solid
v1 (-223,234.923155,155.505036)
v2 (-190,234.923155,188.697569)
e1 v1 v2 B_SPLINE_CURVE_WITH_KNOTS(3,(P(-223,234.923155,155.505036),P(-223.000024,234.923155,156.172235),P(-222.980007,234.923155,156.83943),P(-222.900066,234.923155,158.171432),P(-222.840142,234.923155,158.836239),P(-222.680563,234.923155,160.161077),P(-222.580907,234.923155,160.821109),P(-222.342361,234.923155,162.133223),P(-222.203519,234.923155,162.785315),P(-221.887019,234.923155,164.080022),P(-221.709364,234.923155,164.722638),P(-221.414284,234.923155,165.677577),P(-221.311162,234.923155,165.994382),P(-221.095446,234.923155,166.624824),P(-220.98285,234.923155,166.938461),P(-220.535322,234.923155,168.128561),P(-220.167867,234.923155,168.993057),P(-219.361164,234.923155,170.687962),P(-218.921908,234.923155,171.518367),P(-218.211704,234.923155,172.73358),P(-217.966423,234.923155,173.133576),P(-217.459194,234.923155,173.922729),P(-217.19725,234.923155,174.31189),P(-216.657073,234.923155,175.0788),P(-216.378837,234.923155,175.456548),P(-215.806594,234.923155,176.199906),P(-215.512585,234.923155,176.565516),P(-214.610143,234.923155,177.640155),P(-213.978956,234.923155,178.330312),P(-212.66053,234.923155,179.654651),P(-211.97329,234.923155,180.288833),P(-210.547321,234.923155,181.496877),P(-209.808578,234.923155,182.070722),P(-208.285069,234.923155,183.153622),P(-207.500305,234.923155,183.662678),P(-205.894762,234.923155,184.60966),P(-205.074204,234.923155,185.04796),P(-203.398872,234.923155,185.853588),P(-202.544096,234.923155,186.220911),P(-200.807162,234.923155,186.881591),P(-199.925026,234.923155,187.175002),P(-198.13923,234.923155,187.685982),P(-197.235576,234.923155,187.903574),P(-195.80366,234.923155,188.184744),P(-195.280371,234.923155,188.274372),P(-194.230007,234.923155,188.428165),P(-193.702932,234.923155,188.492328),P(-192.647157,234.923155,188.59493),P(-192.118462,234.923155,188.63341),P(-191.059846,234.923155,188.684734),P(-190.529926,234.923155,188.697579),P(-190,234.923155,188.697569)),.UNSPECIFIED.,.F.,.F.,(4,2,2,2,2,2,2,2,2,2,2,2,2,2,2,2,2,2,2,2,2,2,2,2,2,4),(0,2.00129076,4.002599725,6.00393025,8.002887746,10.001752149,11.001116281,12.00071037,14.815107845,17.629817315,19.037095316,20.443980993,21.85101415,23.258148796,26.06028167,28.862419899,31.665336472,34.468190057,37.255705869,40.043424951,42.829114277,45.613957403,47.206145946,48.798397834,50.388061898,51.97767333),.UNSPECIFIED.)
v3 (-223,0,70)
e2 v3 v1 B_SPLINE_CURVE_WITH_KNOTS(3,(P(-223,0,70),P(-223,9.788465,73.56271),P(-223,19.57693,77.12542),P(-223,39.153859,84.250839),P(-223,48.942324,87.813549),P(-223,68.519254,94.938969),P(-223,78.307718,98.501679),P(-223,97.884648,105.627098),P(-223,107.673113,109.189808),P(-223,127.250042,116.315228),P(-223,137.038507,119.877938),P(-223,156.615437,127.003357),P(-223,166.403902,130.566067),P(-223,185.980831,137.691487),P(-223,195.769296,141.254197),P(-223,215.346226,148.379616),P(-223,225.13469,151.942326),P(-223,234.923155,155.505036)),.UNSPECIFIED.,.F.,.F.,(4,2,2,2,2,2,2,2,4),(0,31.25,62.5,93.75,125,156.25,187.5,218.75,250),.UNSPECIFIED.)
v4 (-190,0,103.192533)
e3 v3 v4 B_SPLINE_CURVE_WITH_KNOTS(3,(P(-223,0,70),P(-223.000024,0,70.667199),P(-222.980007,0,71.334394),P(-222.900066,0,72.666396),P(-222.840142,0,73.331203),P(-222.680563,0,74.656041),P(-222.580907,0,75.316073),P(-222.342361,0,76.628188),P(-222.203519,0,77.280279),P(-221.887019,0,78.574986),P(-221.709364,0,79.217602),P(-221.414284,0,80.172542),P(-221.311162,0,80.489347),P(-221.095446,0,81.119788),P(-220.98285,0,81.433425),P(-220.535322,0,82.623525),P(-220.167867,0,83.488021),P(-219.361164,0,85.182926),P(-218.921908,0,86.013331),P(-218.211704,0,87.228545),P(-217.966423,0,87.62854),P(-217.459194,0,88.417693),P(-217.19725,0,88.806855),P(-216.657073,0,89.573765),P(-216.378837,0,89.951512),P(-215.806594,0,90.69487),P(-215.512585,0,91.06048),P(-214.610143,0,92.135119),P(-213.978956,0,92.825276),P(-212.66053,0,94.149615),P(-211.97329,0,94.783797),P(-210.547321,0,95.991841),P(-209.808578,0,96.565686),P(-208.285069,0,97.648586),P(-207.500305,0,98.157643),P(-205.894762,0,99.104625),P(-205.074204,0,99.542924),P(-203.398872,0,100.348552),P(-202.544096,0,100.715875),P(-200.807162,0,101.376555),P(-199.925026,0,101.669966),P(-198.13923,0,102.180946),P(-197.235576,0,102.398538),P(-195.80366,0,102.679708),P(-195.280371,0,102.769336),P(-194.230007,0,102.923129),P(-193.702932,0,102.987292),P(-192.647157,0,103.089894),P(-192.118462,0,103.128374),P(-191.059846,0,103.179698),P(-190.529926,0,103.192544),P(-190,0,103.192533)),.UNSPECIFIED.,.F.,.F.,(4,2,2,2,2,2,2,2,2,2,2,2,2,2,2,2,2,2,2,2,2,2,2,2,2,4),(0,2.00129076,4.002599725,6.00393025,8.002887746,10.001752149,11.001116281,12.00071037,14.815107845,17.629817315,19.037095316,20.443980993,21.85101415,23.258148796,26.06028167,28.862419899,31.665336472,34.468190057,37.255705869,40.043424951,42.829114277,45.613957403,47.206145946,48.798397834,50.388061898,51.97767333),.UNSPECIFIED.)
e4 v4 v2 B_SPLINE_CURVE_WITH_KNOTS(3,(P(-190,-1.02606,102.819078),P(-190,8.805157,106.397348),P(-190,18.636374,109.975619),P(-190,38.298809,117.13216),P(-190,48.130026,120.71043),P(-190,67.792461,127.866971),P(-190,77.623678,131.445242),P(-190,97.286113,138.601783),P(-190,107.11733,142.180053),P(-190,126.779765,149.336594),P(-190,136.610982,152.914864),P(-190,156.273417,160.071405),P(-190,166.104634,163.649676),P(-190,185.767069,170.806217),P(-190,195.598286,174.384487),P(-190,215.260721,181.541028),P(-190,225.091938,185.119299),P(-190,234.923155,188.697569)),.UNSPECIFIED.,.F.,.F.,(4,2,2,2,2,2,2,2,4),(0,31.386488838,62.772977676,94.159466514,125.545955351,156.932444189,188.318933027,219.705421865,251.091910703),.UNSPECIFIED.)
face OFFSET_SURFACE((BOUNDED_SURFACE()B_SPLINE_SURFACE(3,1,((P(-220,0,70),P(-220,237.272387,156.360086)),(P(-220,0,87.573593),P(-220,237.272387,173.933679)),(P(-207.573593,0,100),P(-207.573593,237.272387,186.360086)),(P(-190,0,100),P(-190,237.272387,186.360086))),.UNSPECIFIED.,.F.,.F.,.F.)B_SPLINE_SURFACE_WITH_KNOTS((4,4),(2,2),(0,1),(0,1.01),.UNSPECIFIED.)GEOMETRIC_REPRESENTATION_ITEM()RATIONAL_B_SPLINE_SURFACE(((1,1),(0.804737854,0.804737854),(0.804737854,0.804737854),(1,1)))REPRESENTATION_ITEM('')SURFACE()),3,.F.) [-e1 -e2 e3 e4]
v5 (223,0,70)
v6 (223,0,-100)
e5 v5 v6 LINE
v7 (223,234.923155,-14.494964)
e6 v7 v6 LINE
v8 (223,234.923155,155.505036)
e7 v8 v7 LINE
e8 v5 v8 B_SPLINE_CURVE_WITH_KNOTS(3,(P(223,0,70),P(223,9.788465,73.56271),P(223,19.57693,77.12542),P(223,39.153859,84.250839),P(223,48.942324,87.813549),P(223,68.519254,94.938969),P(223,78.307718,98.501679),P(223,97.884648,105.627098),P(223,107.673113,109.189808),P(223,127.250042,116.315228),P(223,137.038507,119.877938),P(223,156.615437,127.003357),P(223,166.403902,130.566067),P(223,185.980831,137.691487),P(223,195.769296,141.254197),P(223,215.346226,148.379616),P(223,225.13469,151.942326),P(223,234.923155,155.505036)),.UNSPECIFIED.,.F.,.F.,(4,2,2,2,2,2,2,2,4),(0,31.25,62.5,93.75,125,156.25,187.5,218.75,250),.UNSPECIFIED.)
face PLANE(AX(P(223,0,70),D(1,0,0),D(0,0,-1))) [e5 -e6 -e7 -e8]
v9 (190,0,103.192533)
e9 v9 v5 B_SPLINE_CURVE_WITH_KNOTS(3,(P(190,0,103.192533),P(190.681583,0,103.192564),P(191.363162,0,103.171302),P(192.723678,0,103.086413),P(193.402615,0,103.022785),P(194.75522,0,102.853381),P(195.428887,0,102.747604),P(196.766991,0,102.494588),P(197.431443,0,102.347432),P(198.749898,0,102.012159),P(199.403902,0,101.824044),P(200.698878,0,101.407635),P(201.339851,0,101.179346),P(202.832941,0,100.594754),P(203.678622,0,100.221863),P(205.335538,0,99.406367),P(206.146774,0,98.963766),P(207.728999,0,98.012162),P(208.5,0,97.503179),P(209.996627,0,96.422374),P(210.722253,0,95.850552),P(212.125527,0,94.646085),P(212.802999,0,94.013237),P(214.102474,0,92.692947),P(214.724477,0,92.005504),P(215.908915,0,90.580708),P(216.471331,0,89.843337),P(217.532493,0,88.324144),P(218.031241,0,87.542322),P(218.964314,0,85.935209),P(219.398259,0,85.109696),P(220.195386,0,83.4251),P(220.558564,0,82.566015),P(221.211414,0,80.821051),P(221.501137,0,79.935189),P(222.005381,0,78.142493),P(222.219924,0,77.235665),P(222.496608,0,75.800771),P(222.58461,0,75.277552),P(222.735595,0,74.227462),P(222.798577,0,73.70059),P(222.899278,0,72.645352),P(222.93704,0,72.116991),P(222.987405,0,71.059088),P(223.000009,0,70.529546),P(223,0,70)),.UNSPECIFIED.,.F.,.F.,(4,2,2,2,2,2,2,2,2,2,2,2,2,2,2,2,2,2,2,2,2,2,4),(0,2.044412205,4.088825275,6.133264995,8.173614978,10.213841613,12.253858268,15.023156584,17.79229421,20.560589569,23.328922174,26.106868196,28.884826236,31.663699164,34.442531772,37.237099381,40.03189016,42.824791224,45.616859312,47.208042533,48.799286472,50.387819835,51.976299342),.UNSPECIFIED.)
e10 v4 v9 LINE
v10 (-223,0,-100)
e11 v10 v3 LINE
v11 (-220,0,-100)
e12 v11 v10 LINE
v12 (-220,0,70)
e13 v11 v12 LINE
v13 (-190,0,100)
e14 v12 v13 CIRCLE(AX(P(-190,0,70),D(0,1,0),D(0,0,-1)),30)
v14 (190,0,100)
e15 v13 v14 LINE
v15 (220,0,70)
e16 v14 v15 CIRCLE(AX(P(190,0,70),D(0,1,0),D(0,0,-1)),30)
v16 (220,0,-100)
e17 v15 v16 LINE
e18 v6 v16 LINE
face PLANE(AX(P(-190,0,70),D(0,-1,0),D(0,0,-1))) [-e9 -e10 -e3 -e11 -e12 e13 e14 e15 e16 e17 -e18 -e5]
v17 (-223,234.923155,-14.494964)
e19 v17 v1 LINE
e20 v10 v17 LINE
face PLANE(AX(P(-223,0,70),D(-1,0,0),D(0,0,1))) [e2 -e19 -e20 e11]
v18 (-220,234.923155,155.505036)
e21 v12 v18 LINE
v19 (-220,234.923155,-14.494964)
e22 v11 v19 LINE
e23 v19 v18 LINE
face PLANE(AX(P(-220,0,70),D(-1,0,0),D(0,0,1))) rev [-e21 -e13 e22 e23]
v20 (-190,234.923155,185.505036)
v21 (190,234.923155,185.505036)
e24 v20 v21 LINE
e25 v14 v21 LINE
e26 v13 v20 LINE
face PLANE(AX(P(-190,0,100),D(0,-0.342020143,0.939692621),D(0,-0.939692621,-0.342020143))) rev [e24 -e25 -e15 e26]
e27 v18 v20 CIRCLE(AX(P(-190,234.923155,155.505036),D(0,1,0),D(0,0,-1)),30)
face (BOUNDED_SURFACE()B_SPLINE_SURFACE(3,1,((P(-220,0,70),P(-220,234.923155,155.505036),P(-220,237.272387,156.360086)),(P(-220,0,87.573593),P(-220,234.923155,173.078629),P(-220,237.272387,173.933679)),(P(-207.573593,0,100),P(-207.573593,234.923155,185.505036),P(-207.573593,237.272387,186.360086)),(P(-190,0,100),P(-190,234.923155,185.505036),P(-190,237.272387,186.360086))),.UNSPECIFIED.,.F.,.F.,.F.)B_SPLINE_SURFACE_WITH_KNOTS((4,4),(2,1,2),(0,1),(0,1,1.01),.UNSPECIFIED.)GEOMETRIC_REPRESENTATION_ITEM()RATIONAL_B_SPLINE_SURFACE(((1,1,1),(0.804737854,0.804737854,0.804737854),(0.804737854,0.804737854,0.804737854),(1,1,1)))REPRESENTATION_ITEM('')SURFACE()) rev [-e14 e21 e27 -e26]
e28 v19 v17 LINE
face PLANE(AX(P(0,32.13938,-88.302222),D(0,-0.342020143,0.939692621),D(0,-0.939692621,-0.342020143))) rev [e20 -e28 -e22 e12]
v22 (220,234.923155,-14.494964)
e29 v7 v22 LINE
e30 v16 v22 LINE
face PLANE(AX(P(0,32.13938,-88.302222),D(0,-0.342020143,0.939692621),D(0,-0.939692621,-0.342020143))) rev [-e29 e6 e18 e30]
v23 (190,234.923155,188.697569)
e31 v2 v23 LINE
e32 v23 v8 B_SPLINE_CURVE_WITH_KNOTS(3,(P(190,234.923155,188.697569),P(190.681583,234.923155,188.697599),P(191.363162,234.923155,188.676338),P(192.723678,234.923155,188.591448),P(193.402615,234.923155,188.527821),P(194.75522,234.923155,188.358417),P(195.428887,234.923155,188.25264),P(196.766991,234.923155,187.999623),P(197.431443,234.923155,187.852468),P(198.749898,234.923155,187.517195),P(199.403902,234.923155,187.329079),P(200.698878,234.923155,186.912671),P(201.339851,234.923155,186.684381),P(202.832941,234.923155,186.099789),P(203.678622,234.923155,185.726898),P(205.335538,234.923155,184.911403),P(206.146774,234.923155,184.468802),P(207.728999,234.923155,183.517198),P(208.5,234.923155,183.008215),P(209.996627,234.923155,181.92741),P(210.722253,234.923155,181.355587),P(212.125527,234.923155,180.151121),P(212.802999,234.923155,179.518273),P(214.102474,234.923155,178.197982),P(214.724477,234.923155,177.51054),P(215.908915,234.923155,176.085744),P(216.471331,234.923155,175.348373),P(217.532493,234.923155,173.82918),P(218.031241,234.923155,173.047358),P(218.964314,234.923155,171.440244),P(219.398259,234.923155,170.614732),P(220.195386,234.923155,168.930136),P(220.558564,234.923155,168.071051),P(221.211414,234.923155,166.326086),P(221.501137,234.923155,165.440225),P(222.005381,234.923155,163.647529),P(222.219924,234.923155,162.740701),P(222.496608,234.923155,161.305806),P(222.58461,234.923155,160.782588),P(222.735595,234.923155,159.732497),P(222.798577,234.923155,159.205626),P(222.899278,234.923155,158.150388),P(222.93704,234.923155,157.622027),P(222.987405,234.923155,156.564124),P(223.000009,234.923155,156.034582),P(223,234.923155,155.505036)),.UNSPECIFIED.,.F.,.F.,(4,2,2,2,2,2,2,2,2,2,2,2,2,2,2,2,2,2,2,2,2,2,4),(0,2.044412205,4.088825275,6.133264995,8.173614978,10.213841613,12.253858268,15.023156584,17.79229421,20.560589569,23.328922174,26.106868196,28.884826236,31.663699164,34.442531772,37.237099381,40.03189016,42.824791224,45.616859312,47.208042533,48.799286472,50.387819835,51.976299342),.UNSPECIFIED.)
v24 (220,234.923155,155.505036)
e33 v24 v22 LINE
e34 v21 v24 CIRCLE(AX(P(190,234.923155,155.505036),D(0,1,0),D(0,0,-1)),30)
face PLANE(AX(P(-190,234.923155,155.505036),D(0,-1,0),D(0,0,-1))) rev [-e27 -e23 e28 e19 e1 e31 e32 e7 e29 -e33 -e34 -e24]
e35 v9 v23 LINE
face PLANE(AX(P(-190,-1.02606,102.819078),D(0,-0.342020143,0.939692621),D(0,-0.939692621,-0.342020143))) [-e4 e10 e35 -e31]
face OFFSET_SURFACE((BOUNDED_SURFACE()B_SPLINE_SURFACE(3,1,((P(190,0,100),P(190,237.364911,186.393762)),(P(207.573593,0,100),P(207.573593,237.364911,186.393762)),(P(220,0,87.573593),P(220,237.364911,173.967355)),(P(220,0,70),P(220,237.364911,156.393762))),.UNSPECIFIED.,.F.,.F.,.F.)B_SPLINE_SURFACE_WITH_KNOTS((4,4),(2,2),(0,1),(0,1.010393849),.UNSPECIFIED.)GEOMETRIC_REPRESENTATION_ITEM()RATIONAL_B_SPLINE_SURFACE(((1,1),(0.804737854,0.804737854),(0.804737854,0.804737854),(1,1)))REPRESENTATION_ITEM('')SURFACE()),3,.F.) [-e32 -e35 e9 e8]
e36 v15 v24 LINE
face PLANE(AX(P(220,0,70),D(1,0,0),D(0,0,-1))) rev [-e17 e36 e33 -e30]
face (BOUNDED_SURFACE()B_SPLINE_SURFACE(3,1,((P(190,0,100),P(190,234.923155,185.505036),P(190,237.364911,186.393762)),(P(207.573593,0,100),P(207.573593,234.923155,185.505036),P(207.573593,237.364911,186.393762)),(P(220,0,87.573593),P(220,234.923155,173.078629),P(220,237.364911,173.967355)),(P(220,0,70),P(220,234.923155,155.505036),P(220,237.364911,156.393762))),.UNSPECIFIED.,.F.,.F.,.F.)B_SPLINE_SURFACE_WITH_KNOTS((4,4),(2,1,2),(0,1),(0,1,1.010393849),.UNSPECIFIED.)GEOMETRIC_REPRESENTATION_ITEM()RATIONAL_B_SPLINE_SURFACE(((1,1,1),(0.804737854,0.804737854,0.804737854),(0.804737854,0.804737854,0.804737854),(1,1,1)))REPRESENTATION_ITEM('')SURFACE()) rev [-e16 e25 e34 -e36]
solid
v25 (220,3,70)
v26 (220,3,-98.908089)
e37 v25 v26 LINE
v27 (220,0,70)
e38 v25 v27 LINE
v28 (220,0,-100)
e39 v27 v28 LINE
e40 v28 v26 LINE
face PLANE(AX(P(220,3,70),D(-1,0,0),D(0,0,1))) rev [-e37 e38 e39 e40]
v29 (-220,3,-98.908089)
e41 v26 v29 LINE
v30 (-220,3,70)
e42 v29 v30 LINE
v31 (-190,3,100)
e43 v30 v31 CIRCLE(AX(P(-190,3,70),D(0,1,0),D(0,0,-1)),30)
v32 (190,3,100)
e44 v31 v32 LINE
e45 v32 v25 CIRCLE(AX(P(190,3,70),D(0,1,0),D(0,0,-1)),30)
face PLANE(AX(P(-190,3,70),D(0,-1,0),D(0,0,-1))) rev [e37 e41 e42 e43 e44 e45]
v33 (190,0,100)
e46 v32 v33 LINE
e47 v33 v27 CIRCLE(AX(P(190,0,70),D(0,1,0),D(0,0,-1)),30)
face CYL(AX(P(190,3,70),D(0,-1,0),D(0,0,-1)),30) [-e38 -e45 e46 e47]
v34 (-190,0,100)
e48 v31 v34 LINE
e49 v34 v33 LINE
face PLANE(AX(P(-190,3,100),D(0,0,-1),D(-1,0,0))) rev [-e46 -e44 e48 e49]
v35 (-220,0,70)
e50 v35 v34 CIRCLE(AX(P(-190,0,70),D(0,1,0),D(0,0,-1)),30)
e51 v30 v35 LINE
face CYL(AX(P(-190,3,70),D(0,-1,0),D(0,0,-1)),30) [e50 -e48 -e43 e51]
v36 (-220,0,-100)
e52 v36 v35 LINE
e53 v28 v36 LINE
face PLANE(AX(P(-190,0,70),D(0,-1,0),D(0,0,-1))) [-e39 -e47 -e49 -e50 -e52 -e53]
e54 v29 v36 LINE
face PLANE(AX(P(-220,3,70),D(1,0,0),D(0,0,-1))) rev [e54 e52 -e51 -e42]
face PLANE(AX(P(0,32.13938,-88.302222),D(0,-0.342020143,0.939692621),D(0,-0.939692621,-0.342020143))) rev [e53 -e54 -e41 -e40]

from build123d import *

# Parameters (mm, degrees)
SWEEP_THIN1_START       = 35.293924935
SWEEP_THIN1_DEPTH       = 179.41214993
SWEEP_THIN1_START_2     = -35.293925135
SWEEP_THIN1_2_DEPTH     = 320.587850271
SWEEP_THIN1_START_3     = -67
SWEEP_THIN1_3_OUTLINE_W = 446
SWEEP_THIN1_3_OUTLINE_H = 295
SWEEP_THIN1_3_DEPTH     = 67
SWEEP_THIN1_START_4     = 234.923155196
SWEEP_THIN1_4_OUTLINE_W = 446
SWEEP_THIN1_4_OUTLINE_H = 295
SWEEP_THIN1_4_DEPTH     = 66.330881924
BOSS_EXTRUDE2_DEPTH     = 3
SKETCH6_W               = 723.00386444
SKETCH6_H               = 605.053805232
CUT_EXTRUDE1_DEPTH      = 3


with BuildPart() as part:
    # Sweep-Thin1: read off the stored shape, not the designer's step
    # Sweep-Thin1 outline → Sweep-Thin1 (new body)
    with BuildSketch(Plane(origin=(0, 0, 0), x_dir=(1, 0, 0), z_dir=(0, 0.9396926207859089, 0.3420201433256672)).offset(SWEEP_THIN1_START)):
        with BuildLine():
            Line((223, -65.778483455), (223, 96.969262079))
            Line((223, 96.969262079), (-223, 96.969262079))
            Line((-223, 96.969262079), (-223, -65.778483455))
            add(Edge.make_bspline(
                [(-223, -65.778483455), (-223, -69.477042237), (-222.493972968, -73.37256542), (-221.393047263, -77.378729206), (-219.625765413, -81.371277703), (-217.160966169, -85.187590547), (-214.030117008, -88.644891061), (-210.35485162, -91.564481232), (-206.328004584, -93.851338413), (-202.135894004, -95.485342048), (-197.941508955, -96.501990369), (-193.867765418, -96.969262079), (-190, -96.969262079)],
                knots=[0, 0, 0, 0, 0, 0, 0, 0, 0, 0, 0, 0, 0, 1, 1, 1, 1, 1, 1, 1, 1, 1, 1, 1, 1, 1], degree=12))
            Line((-190, -96.969262079), (190, -96.969262079))
            add(Edge.make_bspline(
                [(190, -96.969262079), (193.867765418, -96.969262079), (197.941508955, -96.501990369), (202.135894005, -95.485342048), (206.328004584, -93.851338413), (210.35485162, -91.564481232), (214.030117008, -88.644891061), (217.16096617, -85.187590547), (219.625765413, -81.371277703), (221.393047263, -77.378729206), (222.493972968, -73.37256542), (223, -69.477042237), (223, -65.778483455)],
                knots=[0, 0, 0, 0, 0, 0, 0, 0, 0, 0, 0, 0, 0, 1, 1, 1, 1, 1, 1, 1, 1, 1, 1, 1, 1, 1], degree=12))
        make_face()
        with BuildLine():
            Line((-220, 93.969262079), (220, 93.969262079))
            Line((220, 93.969262079), (220, -65.778483455))
            add(Edge.make_bspline(
                [(190, -93.969262079), (207.573593129, -93.969262079), (220, -82.292259239), (220, -65.778483455)],
                knots=[0, 0, 0, 0, 1, 1, 1, 1], degree=3, weights=[1, 0.804737854, 0.804737854, 1]))
            Line((190, -93.969262079), (-190, -93.969262079))
            add(Edge.make_bspline(
                [(-220, -65.778483455), (-220, -82.292259239), (-207.573593129, -93.969262079), (-190, -93.969262079)],
                knots=[0, 0, 0, 0, 1, 1, 1, 1], degree=3, weights=[1, 0.804737854, 0.804737854, 1]))
            Line((-220, -65.778483455), (-220, 93.969262079))
        make_face(mode=Mode.SUBTRACT)
    extrude(amount=SWEEP_THIN1_DEPTH)

    # Sweep-Thin1 2 outline → Sweep-Thin1 2 (add)
    with BuildSketch(Plane(origin=(0, 0, 0), x_dir=(1, 0, 0), z_dir=(0, 0.9396926207859089, 0.3420201433256672)).offset(SWEEP_THIN1_START_2)):
        with BuildLine():
            Line((-223, 96.969262079), (-223, -65.778483455))
            add(Edge.make_bspline(
                [(-223, -65.778483455), (-223, -69.477042237), (-222.493972968, -73.37256542), (-221.393047263, -77.378729206), (-219.625765413, -81.371277703), (-217.160966169, -85.187590547), (-214.030117008, -88.644891061), (-210.35485162, -91.564481232), (-206.328004584, -93.851338413), (-202.135894004, -95.485342048), (-197.941508955, -96.501990369), (-193.867765418, -96.969262079), (-190, -96.969262079)],
                knots=[0, 0, 0, 0, 0, 0, 0, 0, 0, 0, 0, 0, 0, 1, 1, 1, 1, 1, 1, 1, 1, 1, 1, 1, 1, 1], degree=12))
            Line((-190, -96.969262079), (190, -96.969262079))
            add(Edge.make_bspline(
                [(190, -96.969262079), (193.867765418, -96.969262079), (197.941508955, -96.501990369), (202.135894005, -95.485342048), (206.328004584, -93.851338413), (210.35485162, -91.564481232), (214.030117008, -88.644891061), (217.16096617, -85.187590547), (219.625765413, -81.371277703), (221.393047263, -77.378729206), (222.493972968, -73.37256542), (223, -69.477042237), (223, -65.778483455)],
                knots=[0, 0, 0, 0, 0, 0, 0, 0, 0, 0, 0, 0, 0, 1, 1, 1, 1, 1, 1, 1, 1, 1, 1, 1, 1, 1], degree=12))
            Line((223, -65.778483455), (223, 96.969262079))
            Line((223, 96.969262079), (-223, 96.969262079))
        make_face()
        with BuildLine():
            add(Edge.make_bspline(
                [(-220, -65.778483455), (-220, -82.292259239), (-207.573593129, -93.969262079), (-190, -93.969262079)],
                knots=[0, 0, 0, 0, 1, 1, 1, 1], degree=3, weights=[1, 0.804737854, 0.804737854, 1]))
            Line((-220, -65.778483455), (-220, 93.969262079))
            Line((-220, 93.969262079), (220, 93.969262079))
            Line((220, 93.969262079), (220, -65.778483455))
            add(Edge.make_bspline(
                [(190, -93.969262079), (207.573593129, -93.969262079), (220, -82.292259239), (220, -65.778483455)],
                knots=[0, 0, 0, 0, 1, 1, 1, 1], degree=3, weights=[1, 0.804737854, 0.804737854, 1]))
            Line((190, -93.969262079), (-190, -93.969262079))
        make_face(mode=Mode.SUBTRACT)
    extrude(amount=SWEEP_THIN1_2_DEPTH)

    # Sweep-Thin1 3 outline → Sweep-Thin1 3 (cut)
    with BuildSketch(Plane(origin=(0, 0, 0), x_dir=(1, 0, 0), z_dir=(0, 1, 0)).offset(SWEEP_THIN1_START_3)):
        with Locations((0, -42.5)):
            Rectangle(SWEEP_THIN1_3_OUTLINE_W, SWEEP_THIN1_3_OUTLINE_H)
    extrude(amount=SWEEP_THIN1_3_DEPTH, mode=Mode.SUBTRACT)

    # Sweep-Thin1 4 outline → Sweep-Thin1 4 (cut)
    with BuildSketch(Plane(origin=(0, 0, 0), x_dir=(1, 0, 0), z_dir=(0, 1, 0)).offset(SWEEP_THIN1_START_4)):
        with Locations((0, -42.5)):
            Rectangle(SWEEP_THIN1_4_OUTLINE_W, SWEEP_THIN1_4_OUTLINE_H)
    extrude(amount=SWEEP_THIN1_4_DEPTH, mode=Mode.SUBTRACT)


with BuildPart() as body_2:
    # Sketch5 → Boss-Extrude2 (new body)
    with BuildSketch(Plane(origin=(0, 0, 0), x_dir=(1, 0, 0), z_dir=(0, 1, 0))):
        with BuildLine():
            Line((-190, -100), (190, -100))
            ThreePointArc((190, -100), (211.213203436, -91.213203436), (220, -70))
            Line((220, -70), (220, 100))
            Line((220, 100), (-220, 100))
            Line((-220, 100), (-220, -70))
            ThreePointArc((-220, -70), (-211.213203436, -91.213203436), (-190, -100))
        make_face()
    extrude(amount=BOSS_EXTRUDE2_DEPTH)


with BuildPart() as cut_extrude1_tool:
    # Sketch6 → Cut-Extrude1 (new body)
    with BuildSketch(Plane(origin=(0, 33.165440914, -91.121300018), x_dir=(-1, 0, 0), z_dir=(0, 0.34202014332566627, -0.9396926207859093))):
        Rectangle(SKETCH6_W, SKETCH6_H)
    extrude(amount=-CUT_EXTRUDE1_DEPTH)


with BuildPart() as part_1:
    add(part.part)

    # Cut-Extrude1: cut by cut_extrude1_tool
    add(cut_extrude1_tool.part, mode=Mode.SUBTRACT)


with BuildPart() as body_2_1:
    add(body_2.part)

    # Cut-Extrude1: cut by cut_extrude1_tool
    add(cut_extrude1_tool.part, mode=Mode.SUBTRACT)


solid = Compound([part_1.part, body_2_1.part])
